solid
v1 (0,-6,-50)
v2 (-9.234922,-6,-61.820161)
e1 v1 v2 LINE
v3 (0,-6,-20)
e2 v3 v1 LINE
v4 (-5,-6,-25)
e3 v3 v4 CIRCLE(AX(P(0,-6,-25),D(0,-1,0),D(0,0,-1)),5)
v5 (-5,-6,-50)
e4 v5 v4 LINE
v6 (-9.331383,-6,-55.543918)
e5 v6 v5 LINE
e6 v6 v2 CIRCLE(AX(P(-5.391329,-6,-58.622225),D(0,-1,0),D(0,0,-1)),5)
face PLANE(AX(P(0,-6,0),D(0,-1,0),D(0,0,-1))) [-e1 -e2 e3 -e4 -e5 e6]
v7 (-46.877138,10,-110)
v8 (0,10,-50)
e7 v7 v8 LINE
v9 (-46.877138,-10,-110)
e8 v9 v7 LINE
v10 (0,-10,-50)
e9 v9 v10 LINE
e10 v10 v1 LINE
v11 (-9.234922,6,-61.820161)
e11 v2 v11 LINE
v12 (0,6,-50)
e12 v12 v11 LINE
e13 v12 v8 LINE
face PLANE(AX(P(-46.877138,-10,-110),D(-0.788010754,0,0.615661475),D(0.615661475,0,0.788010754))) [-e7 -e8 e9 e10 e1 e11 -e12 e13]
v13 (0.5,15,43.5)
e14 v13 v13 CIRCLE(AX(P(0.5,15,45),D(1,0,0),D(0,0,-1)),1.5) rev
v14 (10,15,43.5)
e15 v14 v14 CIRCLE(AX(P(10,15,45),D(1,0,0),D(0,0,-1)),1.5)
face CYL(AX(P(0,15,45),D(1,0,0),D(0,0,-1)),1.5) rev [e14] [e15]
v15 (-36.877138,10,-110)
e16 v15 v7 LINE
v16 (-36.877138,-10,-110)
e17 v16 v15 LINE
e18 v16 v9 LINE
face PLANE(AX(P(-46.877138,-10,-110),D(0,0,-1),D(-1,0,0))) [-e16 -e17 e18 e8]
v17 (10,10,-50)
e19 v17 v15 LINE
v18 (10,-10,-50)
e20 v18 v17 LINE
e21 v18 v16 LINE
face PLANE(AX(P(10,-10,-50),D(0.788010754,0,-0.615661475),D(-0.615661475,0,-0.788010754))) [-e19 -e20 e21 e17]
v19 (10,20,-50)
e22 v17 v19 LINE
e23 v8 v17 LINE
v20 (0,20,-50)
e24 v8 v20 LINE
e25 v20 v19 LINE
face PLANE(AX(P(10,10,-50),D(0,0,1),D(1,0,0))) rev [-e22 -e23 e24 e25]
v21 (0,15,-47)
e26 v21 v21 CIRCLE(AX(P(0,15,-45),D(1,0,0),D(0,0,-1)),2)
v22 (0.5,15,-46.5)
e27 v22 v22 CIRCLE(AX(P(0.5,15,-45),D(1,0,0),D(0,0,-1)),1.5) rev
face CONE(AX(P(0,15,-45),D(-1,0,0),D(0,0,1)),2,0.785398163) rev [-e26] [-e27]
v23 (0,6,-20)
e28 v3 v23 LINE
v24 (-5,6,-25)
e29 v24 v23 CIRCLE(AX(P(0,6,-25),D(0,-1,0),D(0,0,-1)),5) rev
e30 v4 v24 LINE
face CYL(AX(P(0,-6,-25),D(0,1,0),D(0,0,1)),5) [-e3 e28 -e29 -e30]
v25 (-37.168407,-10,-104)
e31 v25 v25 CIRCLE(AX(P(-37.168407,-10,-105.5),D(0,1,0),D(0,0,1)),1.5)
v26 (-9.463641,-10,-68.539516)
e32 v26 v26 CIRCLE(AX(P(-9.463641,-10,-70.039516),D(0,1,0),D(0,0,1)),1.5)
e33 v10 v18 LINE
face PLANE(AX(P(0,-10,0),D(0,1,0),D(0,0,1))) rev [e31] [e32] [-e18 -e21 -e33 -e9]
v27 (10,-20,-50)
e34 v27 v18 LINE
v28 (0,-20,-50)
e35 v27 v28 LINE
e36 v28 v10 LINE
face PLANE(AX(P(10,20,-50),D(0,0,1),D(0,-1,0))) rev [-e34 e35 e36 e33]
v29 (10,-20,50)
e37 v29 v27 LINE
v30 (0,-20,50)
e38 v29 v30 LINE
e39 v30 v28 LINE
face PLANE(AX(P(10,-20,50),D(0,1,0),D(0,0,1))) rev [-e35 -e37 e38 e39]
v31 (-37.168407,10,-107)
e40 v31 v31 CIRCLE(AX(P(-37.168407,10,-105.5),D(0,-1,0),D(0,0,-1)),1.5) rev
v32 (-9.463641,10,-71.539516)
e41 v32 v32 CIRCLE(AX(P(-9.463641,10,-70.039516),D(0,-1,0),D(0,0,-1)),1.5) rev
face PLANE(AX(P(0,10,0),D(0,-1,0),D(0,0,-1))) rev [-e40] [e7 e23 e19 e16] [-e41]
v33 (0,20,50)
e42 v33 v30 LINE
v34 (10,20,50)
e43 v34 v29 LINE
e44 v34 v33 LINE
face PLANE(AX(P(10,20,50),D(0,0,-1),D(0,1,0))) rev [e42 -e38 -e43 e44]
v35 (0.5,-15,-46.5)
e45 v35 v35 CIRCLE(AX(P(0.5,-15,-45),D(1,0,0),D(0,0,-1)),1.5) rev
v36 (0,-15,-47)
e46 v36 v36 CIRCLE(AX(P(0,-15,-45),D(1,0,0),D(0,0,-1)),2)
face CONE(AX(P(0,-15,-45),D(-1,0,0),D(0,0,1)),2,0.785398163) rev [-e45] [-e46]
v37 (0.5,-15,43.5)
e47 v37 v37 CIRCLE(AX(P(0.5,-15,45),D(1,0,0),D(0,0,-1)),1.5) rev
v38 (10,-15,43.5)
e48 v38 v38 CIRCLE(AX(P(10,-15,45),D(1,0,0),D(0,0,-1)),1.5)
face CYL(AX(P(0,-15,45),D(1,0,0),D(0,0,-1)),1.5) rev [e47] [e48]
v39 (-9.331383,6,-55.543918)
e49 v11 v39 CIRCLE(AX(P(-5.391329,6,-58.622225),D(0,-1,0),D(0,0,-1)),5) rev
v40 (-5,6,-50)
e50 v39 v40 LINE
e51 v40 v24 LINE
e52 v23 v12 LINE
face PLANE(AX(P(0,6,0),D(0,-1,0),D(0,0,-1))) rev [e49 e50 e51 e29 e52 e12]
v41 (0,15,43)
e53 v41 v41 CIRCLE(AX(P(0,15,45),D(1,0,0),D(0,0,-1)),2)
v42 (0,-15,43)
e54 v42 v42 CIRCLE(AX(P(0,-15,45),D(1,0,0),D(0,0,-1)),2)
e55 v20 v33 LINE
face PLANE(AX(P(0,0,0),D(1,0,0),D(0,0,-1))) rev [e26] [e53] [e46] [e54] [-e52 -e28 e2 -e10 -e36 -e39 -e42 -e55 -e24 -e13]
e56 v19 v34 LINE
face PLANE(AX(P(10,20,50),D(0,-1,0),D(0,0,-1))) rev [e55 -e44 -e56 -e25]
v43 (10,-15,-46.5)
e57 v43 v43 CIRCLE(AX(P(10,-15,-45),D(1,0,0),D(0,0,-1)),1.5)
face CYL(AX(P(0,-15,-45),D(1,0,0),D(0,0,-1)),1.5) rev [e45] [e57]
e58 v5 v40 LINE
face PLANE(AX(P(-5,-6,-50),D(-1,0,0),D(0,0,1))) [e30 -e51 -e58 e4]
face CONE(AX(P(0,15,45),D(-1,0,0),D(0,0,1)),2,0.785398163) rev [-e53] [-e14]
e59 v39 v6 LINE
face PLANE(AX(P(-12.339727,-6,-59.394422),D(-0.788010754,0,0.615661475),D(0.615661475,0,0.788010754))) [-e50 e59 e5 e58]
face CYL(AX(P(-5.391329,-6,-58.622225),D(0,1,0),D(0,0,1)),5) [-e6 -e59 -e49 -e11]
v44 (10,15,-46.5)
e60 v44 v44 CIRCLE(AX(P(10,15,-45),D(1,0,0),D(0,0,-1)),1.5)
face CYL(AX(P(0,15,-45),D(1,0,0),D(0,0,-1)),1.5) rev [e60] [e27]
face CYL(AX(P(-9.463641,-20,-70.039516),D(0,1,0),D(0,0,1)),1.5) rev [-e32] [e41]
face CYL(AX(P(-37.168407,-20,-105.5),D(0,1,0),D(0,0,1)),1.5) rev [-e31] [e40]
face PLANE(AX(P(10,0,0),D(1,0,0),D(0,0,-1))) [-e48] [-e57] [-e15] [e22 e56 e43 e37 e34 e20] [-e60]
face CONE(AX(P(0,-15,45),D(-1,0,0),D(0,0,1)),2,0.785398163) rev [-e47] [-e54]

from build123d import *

# Parameters (mm, degrees)
SKETCH_1_W           = 100
SKETCH_1_H           = 40
EXTRUDE_1_DEPTH      = 10
EXTRUDE_2_DEPTH      = 30
SKETCH_4_R           = 1.5
CUT_EXTRUDE_1_DEPTH  = 127.085153879
CUT_EXTRUDE_2_DEPTH  = 10
SKETCH_7_R           = 1.5
CUT_EXTRUDE_3_DEPTH  = 10
CHAMFER_2_SIZE       = 0.5
EXTRUDE_3_DEPTH      = 6
EXTRUDE_3_DEPTH_BACK = 6
FILLET_1_R           = 5


with BuildPart() as part:
    # 草图1 → 凸台-拉伸1 (new body)
    with BuildSketch(Plane(origin=(0, 0, 0), x_dir=(0, 0, -1), z_dir=(1, 0, 0))):
        Rectangle(SKETCH_1_W, SKETCH_1_H)
    extrude(amount=EXTRUDE_1_DEPTH)

    # 草图3 → 凸台-拉伸2 (add)
    with BuildSketch(Plane(origin=(0, 20, 0), x_dir=(1, 0, 0), z_dir=(0, 1, 0))):
        Polygon((10, 50), (-36.87713759, 110), (-46.87713759, 110), (0, 50), align=None)
    extrude(amount=-EXTRUDE_2_DEPTH)

    # 草图4 → 切除-拉伸1 (cut, through all)
    with BuildSketch(Plane(origin=(0, 20, 0), x_dir=(1, 0, 0), z_dir=(0, 1, 0))):
        with Locations(Location((-37.168406916, 105.5, 0), (0, 0, 270))):
            Circle(SKETCH_4_R)
        with Locations(Location((-9.463640527, 70.039516088, 0), (0, 0, 270))):
            Circle(SKETCH_4_R)
    extrude(amount=-CUT_EXTRUDE_1_DEPTH, mode=Mode.SUBTRACT)

    # 草图5 → 切除-拉伸2 (cut)
    with BuildSketch(Plane(origin=(0, 20, 0), x_dir=(1, 0, 0), z_dir=(0, 1, 0))):
        Polygon((10, 50), (0, 50), (-46.87713759, 110), (-36.87713759, 110), align=None)
    extrude(amount=-CUT_EXTRUDE_2_DEPTH, mode=Mode.SUBTRACT)

    # 草图7 → 切除-拉伸3 (cut)
    with BuildSketch(Plane(origin=(10, 0, 0), x_dir=(0, 0, -1), z_dir=(1, 0, 0))):
        with Locations((-45, 15)):
            Circle(SKETCH_7_R)
        with Locations((-45, -15)):
            Circle(SKETCH_7_R)
        with Locations((45, -15)):
            Circle(SKETCH_7_R)
        with Locations((45, 15)):
            Circle(SKETCH_7_R)
    extrude(amount=-CUT_EXTRUDE_3_DEPTH, mode=Mode.SUBTRACT)

    # 倒角2
    chamfer_2_edges = [part.edges().sort_by_distance(p)[0] for p in [
        (0, 15, -43.5),
        (0, -15, -43.5),
        (0, -15, 46.5),
        (0, 15, 46.5),
    ]]
    chamfer(chamfer_2_edges, length=CHAMFER_2_SIZE)

    # 草图9 → 凸台-拉伸3 (add, two sides: drawn at the far end of the back side and taken through both)
    with BuildSketch(Plane(origin=(0, 0, 0), x_dir=(1, 0, 0), z_dir=(0, 1, 0)).offset(-EXTRUDE_3_DEPTH_BACK)):
        Polygon((-9.23492213, 61.820161304), (-12.339726869, 59.394421988), (-5, 50), (-5, 20), (0, 20), (0, 50), align=None)
    extrude(amount=EXTRUDE_3_DEPTH + EXTRUDE_3_DEPTH_BACK)

    # 圆角1
    # the kernel refuses this fillet: 5 mm, written as the material it takes off along each edge
    with BuildSketch(Plane(origin=(-5, -18.5, -20), x_dir=(1, 0, 0), z_dir=(0, 1, 0))) as fillet_1_piece_1:
        with BuildLine():
            CenterArc((FILLET_1_R, FILLET_1_R), FILLET_1_R, 180, 90)
            Line((0, FILLET_1_R), (-FILLET_1_R * 0.02, FILLET_1_R))
            Line((-FILLET_1_R * 0.02, FILLET_1_R), (-FILLET_1_R * 0.02, -FILLET_1_R * 0.02))
            Line((-FILLET_1_R * 0.02, -FILLET_1_R * 0.02), (FILLET_1_R, -FILLET_1_R * 0.02))
            Line((FILLET_1_R, -FILLET_1_R * 0.02), (FILLET_1_R, 0))
        make_face()
    extrude(amount=37, mode=Mode.SUBTRACT)
    with BuildSketch(Plane(origin=(-12.339726869, -18.215899984, -59.394421988), x_dir=(0.7880107536067237, 0, -0.6156614753256561), z_dir=(0, 1, 0))) as fillet_1_piece_2:
        with BuildLine():
            CenterArc((5, -4.886359993), FILLET_1_R, 102.23895269, 77.76104731)
            Line((0, -4.886359993), (-0.1, -4.886359993))
            Line((-0.1, -4.886359993), (-0.1, 0))
            Line((-0.1, 0), (0, 0.1))
            ThreePointArc((0, 0.1), (1.970026884, 0.1), (3.918854843, 0.0977272))
            Line((3.918854843, 0.0977272), (3.940053768, 0))
        make_face()
    extrude(amount=36.431799967, mode=Mode.SUBTRACT)


solid = part.part
